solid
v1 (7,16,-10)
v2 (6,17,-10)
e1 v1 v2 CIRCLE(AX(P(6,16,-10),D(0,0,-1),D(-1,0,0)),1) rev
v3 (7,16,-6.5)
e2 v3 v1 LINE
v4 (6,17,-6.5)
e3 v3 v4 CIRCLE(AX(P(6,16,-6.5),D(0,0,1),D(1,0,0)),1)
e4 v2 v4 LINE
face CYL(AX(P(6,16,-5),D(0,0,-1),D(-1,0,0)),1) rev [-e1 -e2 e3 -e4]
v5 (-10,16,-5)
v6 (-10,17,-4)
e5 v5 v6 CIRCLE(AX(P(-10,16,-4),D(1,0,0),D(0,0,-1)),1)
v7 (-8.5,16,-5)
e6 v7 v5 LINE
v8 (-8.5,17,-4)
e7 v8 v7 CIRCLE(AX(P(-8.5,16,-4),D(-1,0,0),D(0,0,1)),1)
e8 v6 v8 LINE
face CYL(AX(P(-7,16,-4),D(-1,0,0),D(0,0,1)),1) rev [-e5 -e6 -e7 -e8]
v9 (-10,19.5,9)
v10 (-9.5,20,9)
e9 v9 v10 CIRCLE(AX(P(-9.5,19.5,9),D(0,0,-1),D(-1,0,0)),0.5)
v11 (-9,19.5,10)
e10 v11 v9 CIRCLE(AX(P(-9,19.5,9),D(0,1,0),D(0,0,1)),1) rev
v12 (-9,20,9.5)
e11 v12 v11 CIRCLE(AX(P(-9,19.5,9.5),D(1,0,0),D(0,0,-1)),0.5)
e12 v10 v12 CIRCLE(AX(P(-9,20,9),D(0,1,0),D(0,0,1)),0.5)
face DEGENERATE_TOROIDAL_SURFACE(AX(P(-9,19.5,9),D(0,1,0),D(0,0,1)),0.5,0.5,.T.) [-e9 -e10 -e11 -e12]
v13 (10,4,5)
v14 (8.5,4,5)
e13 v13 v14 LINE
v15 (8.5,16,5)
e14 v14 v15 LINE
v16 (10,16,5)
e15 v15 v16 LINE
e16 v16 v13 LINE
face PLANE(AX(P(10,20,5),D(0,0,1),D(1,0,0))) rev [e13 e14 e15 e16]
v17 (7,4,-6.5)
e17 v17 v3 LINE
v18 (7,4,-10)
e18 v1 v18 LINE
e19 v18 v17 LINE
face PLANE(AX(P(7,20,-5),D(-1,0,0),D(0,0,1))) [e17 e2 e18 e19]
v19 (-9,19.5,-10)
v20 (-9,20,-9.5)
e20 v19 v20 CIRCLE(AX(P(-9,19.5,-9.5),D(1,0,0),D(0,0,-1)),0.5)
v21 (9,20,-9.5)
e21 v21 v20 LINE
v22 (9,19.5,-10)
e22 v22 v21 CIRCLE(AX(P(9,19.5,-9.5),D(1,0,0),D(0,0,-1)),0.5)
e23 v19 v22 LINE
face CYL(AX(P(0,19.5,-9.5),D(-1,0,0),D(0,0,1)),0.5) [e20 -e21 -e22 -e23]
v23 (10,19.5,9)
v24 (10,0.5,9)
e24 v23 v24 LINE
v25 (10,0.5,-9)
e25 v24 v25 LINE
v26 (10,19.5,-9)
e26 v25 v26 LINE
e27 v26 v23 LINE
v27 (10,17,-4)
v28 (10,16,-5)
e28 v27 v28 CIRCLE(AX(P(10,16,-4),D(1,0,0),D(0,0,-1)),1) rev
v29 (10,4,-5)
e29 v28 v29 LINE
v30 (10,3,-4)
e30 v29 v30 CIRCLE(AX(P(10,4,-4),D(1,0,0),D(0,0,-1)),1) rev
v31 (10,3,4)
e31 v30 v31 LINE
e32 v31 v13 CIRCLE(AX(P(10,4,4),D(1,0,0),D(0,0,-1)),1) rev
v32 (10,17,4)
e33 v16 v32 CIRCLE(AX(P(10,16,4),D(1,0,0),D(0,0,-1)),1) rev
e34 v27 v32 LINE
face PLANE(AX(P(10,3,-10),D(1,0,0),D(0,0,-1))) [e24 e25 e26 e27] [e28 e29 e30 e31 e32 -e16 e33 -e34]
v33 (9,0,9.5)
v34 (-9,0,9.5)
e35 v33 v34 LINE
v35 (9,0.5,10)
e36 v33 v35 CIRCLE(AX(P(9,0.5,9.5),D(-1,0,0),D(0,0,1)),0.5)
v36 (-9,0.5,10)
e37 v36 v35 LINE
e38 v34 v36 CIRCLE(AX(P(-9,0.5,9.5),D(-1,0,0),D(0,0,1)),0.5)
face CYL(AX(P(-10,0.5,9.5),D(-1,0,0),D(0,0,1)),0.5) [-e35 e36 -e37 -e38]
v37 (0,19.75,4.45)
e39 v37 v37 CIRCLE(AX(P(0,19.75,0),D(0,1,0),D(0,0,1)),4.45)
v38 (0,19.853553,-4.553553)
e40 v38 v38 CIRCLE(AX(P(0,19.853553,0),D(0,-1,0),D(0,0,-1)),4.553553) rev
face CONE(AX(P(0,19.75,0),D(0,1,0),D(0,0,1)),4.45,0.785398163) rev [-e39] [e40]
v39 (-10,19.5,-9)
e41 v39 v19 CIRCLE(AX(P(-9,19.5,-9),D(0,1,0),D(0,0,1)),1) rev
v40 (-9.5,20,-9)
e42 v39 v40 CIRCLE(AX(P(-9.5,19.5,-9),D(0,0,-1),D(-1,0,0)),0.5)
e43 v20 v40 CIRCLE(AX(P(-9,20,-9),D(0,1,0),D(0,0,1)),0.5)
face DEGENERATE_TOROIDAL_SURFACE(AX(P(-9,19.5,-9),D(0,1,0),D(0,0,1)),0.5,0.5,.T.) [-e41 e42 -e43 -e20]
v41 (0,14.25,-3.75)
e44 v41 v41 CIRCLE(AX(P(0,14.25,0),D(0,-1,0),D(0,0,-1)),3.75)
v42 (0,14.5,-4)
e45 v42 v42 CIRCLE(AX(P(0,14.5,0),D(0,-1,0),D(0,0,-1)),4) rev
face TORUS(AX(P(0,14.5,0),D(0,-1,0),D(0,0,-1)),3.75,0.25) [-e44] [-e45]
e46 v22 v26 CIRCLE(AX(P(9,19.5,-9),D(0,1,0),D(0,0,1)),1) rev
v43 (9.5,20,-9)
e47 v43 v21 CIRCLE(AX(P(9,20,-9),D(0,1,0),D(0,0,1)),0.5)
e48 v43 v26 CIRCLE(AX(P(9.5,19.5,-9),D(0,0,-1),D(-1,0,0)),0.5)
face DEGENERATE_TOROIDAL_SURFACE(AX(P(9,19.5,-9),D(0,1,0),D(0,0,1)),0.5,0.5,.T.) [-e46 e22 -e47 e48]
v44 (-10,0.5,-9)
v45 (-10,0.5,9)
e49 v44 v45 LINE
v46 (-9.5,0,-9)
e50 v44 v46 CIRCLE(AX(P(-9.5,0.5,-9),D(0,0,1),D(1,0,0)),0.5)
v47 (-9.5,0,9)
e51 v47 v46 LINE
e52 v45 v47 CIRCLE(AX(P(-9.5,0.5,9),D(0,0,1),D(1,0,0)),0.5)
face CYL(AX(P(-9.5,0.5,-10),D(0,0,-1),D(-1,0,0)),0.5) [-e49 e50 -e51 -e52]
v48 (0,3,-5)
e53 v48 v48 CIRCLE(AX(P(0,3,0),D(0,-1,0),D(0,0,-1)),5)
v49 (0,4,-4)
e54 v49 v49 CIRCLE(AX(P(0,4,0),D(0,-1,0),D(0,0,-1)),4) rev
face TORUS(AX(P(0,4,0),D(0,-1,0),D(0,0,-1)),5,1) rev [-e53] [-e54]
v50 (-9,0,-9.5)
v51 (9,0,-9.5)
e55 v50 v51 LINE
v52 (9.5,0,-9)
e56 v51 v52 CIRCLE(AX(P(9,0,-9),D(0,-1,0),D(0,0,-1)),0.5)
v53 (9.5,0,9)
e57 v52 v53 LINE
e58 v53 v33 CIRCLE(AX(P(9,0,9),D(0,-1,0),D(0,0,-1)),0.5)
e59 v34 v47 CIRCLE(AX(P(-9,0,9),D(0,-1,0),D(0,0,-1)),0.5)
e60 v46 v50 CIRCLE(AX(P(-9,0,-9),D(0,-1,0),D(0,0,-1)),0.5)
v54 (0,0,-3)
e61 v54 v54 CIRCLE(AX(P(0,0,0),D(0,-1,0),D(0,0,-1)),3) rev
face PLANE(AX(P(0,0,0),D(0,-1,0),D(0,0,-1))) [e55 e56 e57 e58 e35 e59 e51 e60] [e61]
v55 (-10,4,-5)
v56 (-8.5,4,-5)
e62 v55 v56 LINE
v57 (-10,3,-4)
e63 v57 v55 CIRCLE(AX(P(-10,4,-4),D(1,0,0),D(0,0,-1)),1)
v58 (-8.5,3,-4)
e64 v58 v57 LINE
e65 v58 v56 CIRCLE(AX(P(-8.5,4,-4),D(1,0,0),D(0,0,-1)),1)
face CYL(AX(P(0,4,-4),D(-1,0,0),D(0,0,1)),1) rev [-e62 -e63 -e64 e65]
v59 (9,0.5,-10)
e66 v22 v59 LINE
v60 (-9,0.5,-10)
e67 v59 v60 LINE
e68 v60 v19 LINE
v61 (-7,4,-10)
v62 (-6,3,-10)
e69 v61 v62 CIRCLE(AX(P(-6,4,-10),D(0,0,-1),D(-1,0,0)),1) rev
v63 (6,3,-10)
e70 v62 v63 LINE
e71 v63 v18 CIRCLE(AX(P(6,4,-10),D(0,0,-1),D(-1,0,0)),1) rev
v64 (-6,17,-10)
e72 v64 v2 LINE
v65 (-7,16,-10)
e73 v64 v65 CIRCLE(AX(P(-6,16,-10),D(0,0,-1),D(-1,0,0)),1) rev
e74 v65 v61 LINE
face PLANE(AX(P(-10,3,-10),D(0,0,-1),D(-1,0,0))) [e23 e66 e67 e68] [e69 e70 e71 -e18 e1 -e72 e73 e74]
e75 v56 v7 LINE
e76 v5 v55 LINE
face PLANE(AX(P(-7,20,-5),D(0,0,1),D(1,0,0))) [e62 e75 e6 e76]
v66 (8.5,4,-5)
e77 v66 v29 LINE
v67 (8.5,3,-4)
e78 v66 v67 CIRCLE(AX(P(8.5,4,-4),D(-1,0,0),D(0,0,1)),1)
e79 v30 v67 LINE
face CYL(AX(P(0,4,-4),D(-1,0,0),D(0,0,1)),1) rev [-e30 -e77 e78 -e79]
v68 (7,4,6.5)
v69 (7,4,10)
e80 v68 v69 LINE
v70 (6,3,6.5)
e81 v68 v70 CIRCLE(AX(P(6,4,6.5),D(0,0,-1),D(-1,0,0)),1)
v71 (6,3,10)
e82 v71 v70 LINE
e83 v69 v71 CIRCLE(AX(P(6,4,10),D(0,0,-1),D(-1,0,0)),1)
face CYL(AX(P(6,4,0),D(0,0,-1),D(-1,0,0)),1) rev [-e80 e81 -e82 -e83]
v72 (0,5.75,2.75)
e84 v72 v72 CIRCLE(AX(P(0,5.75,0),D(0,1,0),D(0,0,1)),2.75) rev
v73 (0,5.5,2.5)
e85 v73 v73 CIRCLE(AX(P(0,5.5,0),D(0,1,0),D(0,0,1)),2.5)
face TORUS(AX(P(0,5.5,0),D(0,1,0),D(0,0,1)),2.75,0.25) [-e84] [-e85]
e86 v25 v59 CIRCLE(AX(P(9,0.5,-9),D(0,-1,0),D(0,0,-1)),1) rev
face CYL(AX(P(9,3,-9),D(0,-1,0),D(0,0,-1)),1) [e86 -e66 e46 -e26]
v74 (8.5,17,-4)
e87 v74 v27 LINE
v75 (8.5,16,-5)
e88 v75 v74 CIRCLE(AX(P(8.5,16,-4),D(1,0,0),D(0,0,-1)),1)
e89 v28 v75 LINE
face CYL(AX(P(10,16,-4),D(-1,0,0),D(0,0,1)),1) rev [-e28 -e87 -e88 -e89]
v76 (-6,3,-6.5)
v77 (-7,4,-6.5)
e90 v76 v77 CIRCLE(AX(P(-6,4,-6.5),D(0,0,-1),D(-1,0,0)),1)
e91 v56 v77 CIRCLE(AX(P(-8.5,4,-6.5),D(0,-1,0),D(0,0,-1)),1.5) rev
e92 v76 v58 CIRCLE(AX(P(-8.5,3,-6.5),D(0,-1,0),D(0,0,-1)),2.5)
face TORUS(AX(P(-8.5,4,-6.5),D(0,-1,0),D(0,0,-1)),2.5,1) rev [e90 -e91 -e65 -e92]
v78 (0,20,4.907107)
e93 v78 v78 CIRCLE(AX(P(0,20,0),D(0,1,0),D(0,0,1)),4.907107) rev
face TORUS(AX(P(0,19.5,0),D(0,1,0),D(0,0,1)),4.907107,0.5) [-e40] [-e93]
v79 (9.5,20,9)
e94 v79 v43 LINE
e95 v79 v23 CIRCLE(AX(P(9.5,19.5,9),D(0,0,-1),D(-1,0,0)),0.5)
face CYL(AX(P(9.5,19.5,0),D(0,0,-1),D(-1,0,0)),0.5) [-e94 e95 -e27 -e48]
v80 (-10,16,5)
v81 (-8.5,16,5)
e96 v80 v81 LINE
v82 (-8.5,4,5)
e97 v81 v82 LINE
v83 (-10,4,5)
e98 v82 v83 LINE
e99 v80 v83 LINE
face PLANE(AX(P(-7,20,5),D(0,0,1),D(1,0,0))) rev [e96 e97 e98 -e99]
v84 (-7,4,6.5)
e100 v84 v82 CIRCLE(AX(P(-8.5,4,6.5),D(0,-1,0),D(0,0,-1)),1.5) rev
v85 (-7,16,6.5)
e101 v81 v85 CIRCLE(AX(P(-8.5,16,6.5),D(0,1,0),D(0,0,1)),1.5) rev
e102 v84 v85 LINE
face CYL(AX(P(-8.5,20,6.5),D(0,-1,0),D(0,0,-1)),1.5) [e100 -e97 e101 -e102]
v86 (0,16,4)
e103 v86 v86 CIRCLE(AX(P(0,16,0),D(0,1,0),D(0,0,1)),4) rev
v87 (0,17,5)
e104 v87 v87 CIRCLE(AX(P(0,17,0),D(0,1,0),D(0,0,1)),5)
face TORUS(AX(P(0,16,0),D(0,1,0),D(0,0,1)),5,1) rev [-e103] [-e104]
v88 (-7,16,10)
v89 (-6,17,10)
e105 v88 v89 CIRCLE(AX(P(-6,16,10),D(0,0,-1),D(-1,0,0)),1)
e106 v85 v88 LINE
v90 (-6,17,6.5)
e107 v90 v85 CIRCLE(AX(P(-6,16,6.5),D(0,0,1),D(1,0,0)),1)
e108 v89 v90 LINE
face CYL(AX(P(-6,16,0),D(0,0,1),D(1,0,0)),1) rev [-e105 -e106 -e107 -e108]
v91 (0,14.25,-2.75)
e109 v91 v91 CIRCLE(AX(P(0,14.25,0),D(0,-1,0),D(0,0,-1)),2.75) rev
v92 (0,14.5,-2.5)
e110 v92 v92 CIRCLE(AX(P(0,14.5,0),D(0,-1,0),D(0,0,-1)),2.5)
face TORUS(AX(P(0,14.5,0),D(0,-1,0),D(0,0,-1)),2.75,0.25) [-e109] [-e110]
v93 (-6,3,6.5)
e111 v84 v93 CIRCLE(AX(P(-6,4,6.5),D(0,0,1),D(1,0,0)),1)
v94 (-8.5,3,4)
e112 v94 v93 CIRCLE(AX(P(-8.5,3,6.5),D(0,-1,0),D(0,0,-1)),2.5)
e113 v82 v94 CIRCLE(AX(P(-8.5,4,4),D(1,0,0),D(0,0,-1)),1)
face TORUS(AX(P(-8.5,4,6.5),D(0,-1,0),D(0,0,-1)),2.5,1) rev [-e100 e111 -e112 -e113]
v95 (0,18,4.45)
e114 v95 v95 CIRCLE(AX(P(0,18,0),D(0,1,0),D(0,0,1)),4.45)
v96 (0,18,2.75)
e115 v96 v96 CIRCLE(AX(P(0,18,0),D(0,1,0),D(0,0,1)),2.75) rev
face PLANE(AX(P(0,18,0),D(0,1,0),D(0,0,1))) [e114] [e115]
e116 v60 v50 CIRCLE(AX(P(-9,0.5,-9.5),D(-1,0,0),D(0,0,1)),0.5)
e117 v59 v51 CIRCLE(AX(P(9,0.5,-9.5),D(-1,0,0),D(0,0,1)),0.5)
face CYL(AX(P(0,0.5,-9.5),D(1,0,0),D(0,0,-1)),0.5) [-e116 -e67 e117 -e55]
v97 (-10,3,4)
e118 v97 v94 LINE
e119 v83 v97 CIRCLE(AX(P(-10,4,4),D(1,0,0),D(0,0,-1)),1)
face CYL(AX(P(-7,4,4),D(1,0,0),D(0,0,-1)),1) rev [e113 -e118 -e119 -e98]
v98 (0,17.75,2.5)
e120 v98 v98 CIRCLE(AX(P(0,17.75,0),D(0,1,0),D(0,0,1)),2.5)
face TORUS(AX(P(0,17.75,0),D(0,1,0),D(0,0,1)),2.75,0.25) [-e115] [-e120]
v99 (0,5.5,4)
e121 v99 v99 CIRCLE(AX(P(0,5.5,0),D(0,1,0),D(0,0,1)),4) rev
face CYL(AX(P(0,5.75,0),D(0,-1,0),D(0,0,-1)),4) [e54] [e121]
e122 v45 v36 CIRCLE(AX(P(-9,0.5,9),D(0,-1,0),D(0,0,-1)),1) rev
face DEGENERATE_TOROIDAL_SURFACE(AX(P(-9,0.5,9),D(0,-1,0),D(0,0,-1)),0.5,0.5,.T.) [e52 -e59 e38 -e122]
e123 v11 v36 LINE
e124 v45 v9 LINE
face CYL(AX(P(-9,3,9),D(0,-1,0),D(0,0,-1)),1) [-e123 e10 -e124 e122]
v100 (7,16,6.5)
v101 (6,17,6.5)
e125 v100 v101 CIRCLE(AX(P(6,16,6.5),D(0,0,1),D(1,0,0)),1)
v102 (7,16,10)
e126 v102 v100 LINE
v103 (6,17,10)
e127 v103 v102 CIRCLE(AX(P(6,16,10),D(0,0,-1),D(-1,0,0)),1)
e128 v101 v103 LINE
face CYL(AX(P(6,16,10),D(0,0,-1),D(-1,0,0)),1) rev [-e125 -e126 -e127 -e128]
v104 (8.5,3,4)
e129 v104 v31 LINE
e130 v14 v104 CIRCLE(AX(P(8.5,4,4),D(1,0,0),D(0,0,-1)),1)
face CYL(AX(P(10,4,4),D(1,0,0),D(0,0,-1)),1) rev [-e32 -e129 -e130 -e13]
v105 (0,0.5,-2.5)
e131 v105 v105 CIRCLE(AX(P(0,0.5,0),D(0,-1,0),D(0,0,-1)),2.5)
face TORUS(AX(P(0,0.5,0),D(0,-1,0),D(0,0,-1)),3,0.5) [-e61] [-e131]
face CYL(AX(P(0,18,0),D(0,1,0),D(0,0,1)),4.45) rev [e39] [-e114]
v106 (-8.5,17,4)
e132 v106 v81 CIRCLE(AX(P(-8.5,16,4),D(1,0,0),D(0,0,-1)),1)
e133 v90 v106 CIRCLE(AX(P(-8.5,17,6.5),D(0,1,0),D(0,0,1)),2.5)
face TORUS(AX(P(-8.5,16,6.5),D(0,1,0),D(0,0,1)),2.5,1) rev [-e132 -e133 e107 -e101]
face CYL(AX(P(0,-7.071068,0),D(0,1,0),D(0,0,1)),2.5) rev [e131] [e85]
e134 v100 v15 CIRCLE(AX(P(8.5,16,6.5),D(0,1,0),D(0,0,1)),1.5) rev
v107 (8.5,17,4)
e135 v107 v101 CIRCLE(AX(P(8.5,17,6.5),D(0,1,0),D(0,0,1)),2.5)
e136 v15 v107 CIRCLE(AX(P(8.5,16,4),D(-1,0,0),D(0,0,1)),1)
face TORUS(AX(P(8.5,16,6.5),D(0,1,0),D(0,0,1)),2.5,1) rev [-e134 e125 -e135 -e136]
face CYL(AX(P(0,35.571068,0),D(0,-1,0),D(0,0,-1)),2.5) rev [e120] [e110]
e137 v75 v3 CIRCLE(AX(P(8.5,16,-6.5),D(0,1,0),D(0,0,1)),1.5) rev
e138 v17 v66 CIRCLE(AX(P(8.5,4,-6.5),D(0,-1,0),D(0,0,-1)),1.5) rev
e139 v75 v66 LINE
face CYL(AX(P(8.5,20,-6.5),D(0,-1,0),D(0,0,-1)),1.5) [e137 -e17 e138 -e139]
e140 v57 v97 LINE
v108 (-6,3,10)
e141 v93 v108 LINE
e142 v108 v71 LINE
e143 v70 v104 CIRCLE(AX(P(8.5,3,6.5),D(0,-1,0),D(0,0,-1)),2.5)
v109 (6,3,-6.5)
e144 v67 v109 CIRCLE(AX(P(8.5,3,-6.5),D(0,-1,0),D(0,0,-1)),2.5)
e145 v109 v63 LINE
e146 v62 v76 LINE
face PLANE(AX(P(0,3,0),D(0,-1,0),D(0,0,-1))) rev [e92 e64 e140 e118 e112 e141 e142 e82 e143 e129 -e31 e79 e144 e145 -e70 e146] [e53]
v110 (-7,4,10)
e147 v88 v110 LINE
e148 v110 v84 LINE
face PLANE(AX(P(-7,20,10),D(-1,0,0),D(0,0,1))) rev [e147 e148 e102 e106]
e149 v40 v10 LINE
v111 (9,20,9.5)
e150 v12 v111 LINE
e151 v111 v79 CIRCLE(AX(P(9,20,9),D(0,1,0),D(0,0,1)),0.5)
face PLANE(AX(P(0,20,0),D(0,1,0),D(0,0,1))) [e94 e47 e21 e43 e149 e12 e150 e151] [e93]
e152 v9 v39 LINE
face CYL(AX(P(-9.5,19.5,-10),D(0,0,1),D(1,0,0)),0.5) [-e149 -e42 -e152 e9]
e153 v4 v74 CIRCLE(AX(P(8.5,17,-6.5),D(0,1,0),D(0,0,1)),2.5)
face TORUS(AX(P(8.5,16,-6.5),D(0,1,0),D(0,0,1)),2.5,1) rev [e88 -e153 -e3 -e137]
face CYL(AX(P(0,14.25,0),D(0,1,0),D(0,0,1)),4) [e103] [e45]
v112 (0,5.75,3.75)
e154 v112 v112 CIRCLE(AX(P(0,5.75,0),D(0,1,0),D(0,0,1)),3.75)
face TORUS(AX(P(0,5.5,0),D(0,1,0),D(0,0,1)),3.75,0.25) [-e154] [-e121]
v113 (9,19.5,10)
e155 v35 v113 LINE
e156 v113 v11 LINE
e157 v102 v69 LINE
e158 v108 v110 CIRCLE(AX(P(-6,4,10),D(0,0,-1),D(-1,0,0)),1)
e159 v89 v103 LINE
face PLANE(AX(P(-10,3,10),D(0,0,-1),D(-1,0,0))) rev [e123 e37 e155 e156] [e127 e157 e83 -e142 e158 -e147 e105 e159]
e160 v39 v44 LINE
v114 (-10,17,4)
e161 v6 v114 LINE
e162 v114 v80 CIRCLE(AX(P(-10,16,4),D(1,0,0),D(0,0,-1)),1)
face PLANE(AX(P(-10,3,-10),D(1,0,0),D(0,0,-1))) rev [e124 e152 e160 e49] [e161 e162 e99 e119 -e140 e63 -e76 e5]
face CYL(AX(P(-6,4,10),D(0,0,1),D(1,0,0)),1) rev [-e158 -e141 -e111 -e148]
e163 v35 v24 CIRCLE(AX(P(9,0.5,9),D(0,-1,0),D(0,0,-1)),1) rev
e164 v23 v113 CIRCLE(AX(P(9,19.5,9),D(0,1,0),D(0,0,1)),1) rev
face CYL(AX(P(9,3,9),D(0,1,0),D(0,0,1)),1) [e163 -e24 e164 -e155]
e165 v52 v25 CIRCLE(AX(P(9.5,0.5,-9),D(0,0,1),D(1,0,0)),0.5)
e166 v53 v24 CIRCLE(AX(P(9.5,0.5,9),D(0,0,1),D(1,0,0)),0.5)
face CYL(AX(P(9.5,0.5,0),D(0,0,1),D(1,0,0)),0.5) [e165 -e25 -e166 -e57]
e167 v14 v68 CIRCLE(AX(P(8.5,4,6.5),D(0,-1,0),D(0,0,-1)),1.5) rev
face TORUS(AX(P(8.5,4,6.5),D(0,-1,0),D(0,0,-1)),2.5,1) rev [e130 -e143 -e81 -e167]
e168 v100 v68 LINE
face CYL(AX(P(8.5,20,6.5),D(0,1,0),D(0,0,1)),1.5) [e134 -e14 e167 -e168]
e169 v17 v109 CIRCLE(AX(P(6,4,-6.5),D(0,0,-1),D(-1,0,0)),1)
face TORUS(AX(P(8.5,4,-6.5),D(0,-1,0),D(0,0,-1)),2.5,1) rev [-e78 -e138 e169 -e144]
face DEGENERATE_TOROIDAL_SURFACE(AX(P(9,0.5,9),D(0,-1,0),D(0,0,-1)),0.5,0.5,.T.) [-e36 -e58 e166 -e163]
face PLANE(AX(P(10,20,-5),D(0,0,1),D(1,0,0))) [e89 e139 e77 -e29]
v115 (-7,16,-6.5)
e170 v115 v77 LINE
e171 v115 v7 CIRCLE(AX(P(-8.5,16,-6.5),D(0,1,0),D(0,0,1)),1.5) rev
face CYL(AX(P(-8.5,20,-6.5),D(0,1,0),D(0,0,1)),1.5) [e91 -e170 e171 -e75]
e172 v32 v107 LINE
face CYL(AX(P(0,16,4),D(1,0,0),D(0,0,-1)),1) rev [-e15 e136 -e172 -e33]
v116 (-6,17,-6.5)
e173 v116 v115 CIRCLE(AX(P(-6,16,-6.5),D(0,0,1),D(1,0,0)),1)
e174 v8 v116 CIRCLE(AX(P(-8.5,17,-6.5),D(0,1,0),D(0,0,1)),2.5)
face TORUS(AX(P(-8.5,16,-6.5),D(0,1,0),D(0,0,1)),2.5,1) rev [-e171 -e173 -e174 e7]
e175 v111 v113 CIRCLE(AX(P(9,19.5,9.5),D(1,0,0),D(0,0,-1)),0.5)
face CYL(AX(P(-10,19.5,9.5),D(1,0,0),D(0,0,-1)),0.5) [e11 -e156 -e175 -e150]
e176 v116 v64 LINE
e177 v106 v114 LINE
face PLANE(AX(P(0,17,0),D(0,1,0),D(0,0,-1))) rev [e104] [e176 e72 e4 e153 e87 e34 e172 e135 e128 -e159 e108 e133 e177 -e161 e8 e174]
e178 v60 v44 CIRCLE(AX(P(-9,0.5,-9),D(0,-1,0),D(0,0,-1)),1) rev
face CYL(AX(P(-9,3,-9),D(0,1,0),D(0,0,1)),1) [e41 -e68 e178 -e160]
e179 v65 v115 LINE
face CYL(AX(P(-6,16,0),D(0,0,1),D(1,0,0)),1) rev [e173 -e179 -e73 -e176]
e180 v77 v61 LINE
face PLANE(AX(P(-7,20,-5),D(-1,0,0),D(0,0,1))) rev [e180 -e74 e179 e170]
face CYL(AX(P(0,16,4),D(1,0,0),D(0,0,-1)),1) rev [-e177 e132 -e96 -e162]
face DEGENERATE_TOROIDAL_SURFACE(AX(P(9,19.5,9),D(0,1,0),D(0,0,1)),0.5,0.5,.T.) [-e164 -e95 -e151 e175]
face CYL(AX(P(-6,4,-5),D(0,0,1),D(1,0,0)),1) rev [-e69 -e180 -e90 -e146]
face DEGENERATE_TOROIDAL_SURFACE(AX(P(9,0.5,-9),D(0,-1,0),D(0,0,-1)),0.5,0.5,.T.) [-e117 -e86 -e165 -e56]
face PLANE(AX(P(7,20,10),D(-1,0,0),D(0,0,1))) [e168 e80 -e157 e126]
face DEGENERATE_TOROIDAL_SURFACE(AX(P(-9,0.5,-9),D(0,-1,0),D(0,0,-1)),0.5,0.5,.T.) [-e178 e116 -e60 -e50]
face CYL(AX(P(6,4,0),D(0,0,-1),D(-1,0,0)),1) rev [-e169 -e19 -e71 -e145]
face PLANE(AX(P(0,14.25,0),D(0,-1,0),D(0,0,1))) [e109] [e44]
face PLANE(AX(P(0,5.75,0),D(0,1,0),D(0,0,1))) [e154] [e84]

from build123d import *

# Parameters (mm, degrees)
SKETCH1_W             = 20
SKETCH1_H             = 20
BOSS_EXTRUDE1_DEPTH   = 3
SKETCH1_3_R           = 4
BOSS_EXTRUDE2_DEPTH   = 5.75
SKETCH2_R             = 2.5
CUT_EXTRUDE1_DEPTH    = 5.75
SKETCH1_4_W           = 3
SKETCH1_4_H           = 5
BOSS_EXTRUDE3_DEPTH   = 20
MIRROR2_START         = 17
MIRROR2_OUTLINE_R     = 2.5
MIRROR2_DEPTH         = 3
MIRROR2_START_2       = 14.25
MIRROR2_2_OUTLINE_R   = 4
MIRROR2_2_OUTLINE_R_2 = 2.5
MIRROR2_2_DEPTH       = 2.75
FILLET1_R             = 1
FILLET2_R             = 1.5
FILLET5_R             = 1
SKETCH5_R             = 4.45
CUT_EXTRUDE2_DEPTH    = 2
CHAMFER1_SIZE         = 0.25
FILLET6_R             = 0.5
FILLET7_R             = 0.25


# Read off the part's stored shape, not the designer's step: Mirror2
with BuildPart() as part:
    # Sketch1 → Boss-Extrude1 (new body)
    with BuildSketch(Plane(origin=(0, 0, 0), x_dir=(1, 0, 0), z_dir=(0, 1, 0))):
        Rectangle(SKETCH1_W, SKETCH1_H)
    extrude(amount=BOSS_EXTRUDE1_DEPTH)

    # Sketch1<3> → Boss-Extrude2 (add)
    with BuildSketch(Plane(origin=(0, 0, 0), x_dir=(1, 0, 0), z_dir=(0, 1, 0))):
        with Locations(Location((0, 0, 0), (0, 0, 90))):
            Circle(SKETCH1_3_R)
    extrude(amount=BOSS_EXTRUDE2_DEPTH)

    # Sketch2 → Cut-Extrude1 (cut)
    with BuildSketch(Plane(origin=(0, 5.75, 0), x_dir=(1, 0, 0), z_dir=(0, 1, 0))):
        with Locations(Location((0, 0, 0), (0, 0, 270))):
            Circle(SKETCH2_R)
    extrude(amount=-CUT_EXTRUDE1_DEPTH, mode=Mode.SUBTRACT)

    # Sketch1<4> → Boss-Extrude3 (add)
    with BuildSketch(Plane(origin=(0, 0, 0), x_dir=(1, 0, 0), z_dir=(0, 1, 0))):
        with Locations((8.5, 7.5)):
            Rectangle(SKETCH1_4_W, SKETCH1_4_H)
        with Locations((-8.5, 7.5)):
            Rectangle(SKETCH1_4_W, SKETCH1_4_H)
        with Locations((8.5, -7.5)):
            Rectangle(SKETCH1_4_W, SKETCH1_4_H)
        with Locations((-8.5, -7.5)):
            Rectangle(SKETCH1_4_W, SKETCH1_4_H)
    extrude(amount=BOSS_EXTRUDE3_DEPTH)

    # Mirror2 outline → Mirror2 (add)
    with BuildSketch(Plane(origin=(0, 0, 0), x_dir=(1, 0, 0), z_dir=(0, 1, 0)).offset(MIRROR2_START)):
        Polygon((7, 5), (7, 10), (-7, 10), (-7, 5), (-10, 5), (-10, -5), (-7, -5), (-7, -10), (7, -10), (7, -5), (10, -5), (10, 5), align=None)
        Circle(MIRROR2_OUTLINE_R, mode=Mode.SUBTRACT)
    extrude(amount=MIRROR2_DEPTH)

    # Mirror2 2 outline → Mirror2 2 (add)
    with BuildSketch(Plane(origin=(0, 0, 0), x_dir=(1, 0, 0), z_dir=(0, 1, 0)).offset(MIRROR2_START_2)):
        Circle(MIRROR2_2_OUTLINE_R)
        Circle(MIRROR2_2_OUTLINE_R_2, mode=Mode.SUBTRACT)
    extrude(amount=MIRROR2_2_DEPTH)

    # Fillet1
    fillet1_edges = [part.edges().sort_by_distance(p)[0] for p in [
        (-10, 10, -10),
        (-10, 10, 10),
        (10, 10, 10),
        (10, 10, -10),
    ]]
    fillet(fillet1_edges, radius=FILLET1_R)

    # Fillet2
    fillet2_edges = [part.edges().sort_by_distance(p)[0] for p in [
        (-7, 10, 5),
        (7, 10, 5),
        (7, 10, -5),
        (-7, 10, -5),
    ]]
    fillet(fillet2_edges, radius=FILLET2_R)

    # Fillet5
    fillet5_edges = [part.edges().sort_by_distance(p)[0] for p in [
        (9.25, 17, -5),
        (9.25, 17, 5),
        (-7, 17, 8.25),
        (7, 17, 8.25),
        (0, 3, 4),
        (-4, 17, 0),
        (-9.25, 17, 5),
        (-9.25, 3, 5),
        (7, 17, -8.25),
        (7, 3, -8.25),
        (-7, 17, -8.25),
        (-7, 3, -8.25),
        (-9.25, 17, -5),
        (-9.25, 3, -5),
        (-7.439339828, 3, 5.439339828),
        (-7.439339828, 17, 5.439339828),
        (7.439339828, 3, 5.439339828),
        (7.439339828, 17, 5.439339828),
        (7.439339828, 3, -5.439339828),
        (7.439339828, 17, -5.439339828),
        (-7.439339828, 3, -5.439339828),
        (-7.439339828, 17, -5.439339828),
        (9.25, 3, -5),
        (9.25, 3, 5),
        (7, 3, 8.25),
        (-7, 3, 8.25),
    ]]
    fillet(fillet5_edges, radius=FILLET5_R)

    # Sketch5 → Cut-Extrude2 (cut)
    with BuildSketch(Plane(origin=(0, 20, 0), x_dir=(1, 0, 0), z_dir=(0, 1, 0))):
        with Locations(Location((0, 0, 0), (0, 0, 270))):
            Circle(SKETCH5_R)
    extrude(amount=-CUT_EXTRUDE2_DEPTH, mode=Mode.SUBTRACT)

    # Chamfer1
    chamfer1_edges = [part.edges().sort_by_distance(p)[0] for p in [
        (0, 20, -4.45),
    ]]
    chamfer(chamfer1_edges, length=CHAMFER1_SIZE)

    # Fillet6
    fillet6_edges = [part.edges().sort_by_distance(p)[0] for p in [
        (-10, 20, 0),
        (-10, 0, 0),
        (10, 0, 0),
        (0, 0, 10),
        (0, 0, -10),
        (-9.707106781, 0, 9.707106781),
        (9.707106781, 0, 9.707106781),
        (9.707106781, 0, -9.707106781),
        (-9.707106781, 0, -9.707106781),
        (0, 20, -10),
        (0, 20, 10),
        (10, 20, 0),
        (-9.707106781, 20, 9.707106781),
        (9.707106781, 20, 9.707106781),
        (9.707106781, 20, -9.707106781),
        (-9.707106781, 20, -9.707106781),
        (0, 0, -2.5),
        (0, 20, -4.7),
    ]]
    fillet(fillet6_edges, radius=FILLET6_R)

    # Fillet7
    fillet7_edges = [part.edges().sort_by_distance(p)[0] for p in [
        (-4, 14.25, 0),
        (0, 5.75, 4),
        (-2.5, 14.25, 0),
        (0, 5.75, -2.5),
        (-2.5, 18, 0),
    ]]
    fillet(fillet7_edges, radius=FILLET7_R)


solid = part.part
